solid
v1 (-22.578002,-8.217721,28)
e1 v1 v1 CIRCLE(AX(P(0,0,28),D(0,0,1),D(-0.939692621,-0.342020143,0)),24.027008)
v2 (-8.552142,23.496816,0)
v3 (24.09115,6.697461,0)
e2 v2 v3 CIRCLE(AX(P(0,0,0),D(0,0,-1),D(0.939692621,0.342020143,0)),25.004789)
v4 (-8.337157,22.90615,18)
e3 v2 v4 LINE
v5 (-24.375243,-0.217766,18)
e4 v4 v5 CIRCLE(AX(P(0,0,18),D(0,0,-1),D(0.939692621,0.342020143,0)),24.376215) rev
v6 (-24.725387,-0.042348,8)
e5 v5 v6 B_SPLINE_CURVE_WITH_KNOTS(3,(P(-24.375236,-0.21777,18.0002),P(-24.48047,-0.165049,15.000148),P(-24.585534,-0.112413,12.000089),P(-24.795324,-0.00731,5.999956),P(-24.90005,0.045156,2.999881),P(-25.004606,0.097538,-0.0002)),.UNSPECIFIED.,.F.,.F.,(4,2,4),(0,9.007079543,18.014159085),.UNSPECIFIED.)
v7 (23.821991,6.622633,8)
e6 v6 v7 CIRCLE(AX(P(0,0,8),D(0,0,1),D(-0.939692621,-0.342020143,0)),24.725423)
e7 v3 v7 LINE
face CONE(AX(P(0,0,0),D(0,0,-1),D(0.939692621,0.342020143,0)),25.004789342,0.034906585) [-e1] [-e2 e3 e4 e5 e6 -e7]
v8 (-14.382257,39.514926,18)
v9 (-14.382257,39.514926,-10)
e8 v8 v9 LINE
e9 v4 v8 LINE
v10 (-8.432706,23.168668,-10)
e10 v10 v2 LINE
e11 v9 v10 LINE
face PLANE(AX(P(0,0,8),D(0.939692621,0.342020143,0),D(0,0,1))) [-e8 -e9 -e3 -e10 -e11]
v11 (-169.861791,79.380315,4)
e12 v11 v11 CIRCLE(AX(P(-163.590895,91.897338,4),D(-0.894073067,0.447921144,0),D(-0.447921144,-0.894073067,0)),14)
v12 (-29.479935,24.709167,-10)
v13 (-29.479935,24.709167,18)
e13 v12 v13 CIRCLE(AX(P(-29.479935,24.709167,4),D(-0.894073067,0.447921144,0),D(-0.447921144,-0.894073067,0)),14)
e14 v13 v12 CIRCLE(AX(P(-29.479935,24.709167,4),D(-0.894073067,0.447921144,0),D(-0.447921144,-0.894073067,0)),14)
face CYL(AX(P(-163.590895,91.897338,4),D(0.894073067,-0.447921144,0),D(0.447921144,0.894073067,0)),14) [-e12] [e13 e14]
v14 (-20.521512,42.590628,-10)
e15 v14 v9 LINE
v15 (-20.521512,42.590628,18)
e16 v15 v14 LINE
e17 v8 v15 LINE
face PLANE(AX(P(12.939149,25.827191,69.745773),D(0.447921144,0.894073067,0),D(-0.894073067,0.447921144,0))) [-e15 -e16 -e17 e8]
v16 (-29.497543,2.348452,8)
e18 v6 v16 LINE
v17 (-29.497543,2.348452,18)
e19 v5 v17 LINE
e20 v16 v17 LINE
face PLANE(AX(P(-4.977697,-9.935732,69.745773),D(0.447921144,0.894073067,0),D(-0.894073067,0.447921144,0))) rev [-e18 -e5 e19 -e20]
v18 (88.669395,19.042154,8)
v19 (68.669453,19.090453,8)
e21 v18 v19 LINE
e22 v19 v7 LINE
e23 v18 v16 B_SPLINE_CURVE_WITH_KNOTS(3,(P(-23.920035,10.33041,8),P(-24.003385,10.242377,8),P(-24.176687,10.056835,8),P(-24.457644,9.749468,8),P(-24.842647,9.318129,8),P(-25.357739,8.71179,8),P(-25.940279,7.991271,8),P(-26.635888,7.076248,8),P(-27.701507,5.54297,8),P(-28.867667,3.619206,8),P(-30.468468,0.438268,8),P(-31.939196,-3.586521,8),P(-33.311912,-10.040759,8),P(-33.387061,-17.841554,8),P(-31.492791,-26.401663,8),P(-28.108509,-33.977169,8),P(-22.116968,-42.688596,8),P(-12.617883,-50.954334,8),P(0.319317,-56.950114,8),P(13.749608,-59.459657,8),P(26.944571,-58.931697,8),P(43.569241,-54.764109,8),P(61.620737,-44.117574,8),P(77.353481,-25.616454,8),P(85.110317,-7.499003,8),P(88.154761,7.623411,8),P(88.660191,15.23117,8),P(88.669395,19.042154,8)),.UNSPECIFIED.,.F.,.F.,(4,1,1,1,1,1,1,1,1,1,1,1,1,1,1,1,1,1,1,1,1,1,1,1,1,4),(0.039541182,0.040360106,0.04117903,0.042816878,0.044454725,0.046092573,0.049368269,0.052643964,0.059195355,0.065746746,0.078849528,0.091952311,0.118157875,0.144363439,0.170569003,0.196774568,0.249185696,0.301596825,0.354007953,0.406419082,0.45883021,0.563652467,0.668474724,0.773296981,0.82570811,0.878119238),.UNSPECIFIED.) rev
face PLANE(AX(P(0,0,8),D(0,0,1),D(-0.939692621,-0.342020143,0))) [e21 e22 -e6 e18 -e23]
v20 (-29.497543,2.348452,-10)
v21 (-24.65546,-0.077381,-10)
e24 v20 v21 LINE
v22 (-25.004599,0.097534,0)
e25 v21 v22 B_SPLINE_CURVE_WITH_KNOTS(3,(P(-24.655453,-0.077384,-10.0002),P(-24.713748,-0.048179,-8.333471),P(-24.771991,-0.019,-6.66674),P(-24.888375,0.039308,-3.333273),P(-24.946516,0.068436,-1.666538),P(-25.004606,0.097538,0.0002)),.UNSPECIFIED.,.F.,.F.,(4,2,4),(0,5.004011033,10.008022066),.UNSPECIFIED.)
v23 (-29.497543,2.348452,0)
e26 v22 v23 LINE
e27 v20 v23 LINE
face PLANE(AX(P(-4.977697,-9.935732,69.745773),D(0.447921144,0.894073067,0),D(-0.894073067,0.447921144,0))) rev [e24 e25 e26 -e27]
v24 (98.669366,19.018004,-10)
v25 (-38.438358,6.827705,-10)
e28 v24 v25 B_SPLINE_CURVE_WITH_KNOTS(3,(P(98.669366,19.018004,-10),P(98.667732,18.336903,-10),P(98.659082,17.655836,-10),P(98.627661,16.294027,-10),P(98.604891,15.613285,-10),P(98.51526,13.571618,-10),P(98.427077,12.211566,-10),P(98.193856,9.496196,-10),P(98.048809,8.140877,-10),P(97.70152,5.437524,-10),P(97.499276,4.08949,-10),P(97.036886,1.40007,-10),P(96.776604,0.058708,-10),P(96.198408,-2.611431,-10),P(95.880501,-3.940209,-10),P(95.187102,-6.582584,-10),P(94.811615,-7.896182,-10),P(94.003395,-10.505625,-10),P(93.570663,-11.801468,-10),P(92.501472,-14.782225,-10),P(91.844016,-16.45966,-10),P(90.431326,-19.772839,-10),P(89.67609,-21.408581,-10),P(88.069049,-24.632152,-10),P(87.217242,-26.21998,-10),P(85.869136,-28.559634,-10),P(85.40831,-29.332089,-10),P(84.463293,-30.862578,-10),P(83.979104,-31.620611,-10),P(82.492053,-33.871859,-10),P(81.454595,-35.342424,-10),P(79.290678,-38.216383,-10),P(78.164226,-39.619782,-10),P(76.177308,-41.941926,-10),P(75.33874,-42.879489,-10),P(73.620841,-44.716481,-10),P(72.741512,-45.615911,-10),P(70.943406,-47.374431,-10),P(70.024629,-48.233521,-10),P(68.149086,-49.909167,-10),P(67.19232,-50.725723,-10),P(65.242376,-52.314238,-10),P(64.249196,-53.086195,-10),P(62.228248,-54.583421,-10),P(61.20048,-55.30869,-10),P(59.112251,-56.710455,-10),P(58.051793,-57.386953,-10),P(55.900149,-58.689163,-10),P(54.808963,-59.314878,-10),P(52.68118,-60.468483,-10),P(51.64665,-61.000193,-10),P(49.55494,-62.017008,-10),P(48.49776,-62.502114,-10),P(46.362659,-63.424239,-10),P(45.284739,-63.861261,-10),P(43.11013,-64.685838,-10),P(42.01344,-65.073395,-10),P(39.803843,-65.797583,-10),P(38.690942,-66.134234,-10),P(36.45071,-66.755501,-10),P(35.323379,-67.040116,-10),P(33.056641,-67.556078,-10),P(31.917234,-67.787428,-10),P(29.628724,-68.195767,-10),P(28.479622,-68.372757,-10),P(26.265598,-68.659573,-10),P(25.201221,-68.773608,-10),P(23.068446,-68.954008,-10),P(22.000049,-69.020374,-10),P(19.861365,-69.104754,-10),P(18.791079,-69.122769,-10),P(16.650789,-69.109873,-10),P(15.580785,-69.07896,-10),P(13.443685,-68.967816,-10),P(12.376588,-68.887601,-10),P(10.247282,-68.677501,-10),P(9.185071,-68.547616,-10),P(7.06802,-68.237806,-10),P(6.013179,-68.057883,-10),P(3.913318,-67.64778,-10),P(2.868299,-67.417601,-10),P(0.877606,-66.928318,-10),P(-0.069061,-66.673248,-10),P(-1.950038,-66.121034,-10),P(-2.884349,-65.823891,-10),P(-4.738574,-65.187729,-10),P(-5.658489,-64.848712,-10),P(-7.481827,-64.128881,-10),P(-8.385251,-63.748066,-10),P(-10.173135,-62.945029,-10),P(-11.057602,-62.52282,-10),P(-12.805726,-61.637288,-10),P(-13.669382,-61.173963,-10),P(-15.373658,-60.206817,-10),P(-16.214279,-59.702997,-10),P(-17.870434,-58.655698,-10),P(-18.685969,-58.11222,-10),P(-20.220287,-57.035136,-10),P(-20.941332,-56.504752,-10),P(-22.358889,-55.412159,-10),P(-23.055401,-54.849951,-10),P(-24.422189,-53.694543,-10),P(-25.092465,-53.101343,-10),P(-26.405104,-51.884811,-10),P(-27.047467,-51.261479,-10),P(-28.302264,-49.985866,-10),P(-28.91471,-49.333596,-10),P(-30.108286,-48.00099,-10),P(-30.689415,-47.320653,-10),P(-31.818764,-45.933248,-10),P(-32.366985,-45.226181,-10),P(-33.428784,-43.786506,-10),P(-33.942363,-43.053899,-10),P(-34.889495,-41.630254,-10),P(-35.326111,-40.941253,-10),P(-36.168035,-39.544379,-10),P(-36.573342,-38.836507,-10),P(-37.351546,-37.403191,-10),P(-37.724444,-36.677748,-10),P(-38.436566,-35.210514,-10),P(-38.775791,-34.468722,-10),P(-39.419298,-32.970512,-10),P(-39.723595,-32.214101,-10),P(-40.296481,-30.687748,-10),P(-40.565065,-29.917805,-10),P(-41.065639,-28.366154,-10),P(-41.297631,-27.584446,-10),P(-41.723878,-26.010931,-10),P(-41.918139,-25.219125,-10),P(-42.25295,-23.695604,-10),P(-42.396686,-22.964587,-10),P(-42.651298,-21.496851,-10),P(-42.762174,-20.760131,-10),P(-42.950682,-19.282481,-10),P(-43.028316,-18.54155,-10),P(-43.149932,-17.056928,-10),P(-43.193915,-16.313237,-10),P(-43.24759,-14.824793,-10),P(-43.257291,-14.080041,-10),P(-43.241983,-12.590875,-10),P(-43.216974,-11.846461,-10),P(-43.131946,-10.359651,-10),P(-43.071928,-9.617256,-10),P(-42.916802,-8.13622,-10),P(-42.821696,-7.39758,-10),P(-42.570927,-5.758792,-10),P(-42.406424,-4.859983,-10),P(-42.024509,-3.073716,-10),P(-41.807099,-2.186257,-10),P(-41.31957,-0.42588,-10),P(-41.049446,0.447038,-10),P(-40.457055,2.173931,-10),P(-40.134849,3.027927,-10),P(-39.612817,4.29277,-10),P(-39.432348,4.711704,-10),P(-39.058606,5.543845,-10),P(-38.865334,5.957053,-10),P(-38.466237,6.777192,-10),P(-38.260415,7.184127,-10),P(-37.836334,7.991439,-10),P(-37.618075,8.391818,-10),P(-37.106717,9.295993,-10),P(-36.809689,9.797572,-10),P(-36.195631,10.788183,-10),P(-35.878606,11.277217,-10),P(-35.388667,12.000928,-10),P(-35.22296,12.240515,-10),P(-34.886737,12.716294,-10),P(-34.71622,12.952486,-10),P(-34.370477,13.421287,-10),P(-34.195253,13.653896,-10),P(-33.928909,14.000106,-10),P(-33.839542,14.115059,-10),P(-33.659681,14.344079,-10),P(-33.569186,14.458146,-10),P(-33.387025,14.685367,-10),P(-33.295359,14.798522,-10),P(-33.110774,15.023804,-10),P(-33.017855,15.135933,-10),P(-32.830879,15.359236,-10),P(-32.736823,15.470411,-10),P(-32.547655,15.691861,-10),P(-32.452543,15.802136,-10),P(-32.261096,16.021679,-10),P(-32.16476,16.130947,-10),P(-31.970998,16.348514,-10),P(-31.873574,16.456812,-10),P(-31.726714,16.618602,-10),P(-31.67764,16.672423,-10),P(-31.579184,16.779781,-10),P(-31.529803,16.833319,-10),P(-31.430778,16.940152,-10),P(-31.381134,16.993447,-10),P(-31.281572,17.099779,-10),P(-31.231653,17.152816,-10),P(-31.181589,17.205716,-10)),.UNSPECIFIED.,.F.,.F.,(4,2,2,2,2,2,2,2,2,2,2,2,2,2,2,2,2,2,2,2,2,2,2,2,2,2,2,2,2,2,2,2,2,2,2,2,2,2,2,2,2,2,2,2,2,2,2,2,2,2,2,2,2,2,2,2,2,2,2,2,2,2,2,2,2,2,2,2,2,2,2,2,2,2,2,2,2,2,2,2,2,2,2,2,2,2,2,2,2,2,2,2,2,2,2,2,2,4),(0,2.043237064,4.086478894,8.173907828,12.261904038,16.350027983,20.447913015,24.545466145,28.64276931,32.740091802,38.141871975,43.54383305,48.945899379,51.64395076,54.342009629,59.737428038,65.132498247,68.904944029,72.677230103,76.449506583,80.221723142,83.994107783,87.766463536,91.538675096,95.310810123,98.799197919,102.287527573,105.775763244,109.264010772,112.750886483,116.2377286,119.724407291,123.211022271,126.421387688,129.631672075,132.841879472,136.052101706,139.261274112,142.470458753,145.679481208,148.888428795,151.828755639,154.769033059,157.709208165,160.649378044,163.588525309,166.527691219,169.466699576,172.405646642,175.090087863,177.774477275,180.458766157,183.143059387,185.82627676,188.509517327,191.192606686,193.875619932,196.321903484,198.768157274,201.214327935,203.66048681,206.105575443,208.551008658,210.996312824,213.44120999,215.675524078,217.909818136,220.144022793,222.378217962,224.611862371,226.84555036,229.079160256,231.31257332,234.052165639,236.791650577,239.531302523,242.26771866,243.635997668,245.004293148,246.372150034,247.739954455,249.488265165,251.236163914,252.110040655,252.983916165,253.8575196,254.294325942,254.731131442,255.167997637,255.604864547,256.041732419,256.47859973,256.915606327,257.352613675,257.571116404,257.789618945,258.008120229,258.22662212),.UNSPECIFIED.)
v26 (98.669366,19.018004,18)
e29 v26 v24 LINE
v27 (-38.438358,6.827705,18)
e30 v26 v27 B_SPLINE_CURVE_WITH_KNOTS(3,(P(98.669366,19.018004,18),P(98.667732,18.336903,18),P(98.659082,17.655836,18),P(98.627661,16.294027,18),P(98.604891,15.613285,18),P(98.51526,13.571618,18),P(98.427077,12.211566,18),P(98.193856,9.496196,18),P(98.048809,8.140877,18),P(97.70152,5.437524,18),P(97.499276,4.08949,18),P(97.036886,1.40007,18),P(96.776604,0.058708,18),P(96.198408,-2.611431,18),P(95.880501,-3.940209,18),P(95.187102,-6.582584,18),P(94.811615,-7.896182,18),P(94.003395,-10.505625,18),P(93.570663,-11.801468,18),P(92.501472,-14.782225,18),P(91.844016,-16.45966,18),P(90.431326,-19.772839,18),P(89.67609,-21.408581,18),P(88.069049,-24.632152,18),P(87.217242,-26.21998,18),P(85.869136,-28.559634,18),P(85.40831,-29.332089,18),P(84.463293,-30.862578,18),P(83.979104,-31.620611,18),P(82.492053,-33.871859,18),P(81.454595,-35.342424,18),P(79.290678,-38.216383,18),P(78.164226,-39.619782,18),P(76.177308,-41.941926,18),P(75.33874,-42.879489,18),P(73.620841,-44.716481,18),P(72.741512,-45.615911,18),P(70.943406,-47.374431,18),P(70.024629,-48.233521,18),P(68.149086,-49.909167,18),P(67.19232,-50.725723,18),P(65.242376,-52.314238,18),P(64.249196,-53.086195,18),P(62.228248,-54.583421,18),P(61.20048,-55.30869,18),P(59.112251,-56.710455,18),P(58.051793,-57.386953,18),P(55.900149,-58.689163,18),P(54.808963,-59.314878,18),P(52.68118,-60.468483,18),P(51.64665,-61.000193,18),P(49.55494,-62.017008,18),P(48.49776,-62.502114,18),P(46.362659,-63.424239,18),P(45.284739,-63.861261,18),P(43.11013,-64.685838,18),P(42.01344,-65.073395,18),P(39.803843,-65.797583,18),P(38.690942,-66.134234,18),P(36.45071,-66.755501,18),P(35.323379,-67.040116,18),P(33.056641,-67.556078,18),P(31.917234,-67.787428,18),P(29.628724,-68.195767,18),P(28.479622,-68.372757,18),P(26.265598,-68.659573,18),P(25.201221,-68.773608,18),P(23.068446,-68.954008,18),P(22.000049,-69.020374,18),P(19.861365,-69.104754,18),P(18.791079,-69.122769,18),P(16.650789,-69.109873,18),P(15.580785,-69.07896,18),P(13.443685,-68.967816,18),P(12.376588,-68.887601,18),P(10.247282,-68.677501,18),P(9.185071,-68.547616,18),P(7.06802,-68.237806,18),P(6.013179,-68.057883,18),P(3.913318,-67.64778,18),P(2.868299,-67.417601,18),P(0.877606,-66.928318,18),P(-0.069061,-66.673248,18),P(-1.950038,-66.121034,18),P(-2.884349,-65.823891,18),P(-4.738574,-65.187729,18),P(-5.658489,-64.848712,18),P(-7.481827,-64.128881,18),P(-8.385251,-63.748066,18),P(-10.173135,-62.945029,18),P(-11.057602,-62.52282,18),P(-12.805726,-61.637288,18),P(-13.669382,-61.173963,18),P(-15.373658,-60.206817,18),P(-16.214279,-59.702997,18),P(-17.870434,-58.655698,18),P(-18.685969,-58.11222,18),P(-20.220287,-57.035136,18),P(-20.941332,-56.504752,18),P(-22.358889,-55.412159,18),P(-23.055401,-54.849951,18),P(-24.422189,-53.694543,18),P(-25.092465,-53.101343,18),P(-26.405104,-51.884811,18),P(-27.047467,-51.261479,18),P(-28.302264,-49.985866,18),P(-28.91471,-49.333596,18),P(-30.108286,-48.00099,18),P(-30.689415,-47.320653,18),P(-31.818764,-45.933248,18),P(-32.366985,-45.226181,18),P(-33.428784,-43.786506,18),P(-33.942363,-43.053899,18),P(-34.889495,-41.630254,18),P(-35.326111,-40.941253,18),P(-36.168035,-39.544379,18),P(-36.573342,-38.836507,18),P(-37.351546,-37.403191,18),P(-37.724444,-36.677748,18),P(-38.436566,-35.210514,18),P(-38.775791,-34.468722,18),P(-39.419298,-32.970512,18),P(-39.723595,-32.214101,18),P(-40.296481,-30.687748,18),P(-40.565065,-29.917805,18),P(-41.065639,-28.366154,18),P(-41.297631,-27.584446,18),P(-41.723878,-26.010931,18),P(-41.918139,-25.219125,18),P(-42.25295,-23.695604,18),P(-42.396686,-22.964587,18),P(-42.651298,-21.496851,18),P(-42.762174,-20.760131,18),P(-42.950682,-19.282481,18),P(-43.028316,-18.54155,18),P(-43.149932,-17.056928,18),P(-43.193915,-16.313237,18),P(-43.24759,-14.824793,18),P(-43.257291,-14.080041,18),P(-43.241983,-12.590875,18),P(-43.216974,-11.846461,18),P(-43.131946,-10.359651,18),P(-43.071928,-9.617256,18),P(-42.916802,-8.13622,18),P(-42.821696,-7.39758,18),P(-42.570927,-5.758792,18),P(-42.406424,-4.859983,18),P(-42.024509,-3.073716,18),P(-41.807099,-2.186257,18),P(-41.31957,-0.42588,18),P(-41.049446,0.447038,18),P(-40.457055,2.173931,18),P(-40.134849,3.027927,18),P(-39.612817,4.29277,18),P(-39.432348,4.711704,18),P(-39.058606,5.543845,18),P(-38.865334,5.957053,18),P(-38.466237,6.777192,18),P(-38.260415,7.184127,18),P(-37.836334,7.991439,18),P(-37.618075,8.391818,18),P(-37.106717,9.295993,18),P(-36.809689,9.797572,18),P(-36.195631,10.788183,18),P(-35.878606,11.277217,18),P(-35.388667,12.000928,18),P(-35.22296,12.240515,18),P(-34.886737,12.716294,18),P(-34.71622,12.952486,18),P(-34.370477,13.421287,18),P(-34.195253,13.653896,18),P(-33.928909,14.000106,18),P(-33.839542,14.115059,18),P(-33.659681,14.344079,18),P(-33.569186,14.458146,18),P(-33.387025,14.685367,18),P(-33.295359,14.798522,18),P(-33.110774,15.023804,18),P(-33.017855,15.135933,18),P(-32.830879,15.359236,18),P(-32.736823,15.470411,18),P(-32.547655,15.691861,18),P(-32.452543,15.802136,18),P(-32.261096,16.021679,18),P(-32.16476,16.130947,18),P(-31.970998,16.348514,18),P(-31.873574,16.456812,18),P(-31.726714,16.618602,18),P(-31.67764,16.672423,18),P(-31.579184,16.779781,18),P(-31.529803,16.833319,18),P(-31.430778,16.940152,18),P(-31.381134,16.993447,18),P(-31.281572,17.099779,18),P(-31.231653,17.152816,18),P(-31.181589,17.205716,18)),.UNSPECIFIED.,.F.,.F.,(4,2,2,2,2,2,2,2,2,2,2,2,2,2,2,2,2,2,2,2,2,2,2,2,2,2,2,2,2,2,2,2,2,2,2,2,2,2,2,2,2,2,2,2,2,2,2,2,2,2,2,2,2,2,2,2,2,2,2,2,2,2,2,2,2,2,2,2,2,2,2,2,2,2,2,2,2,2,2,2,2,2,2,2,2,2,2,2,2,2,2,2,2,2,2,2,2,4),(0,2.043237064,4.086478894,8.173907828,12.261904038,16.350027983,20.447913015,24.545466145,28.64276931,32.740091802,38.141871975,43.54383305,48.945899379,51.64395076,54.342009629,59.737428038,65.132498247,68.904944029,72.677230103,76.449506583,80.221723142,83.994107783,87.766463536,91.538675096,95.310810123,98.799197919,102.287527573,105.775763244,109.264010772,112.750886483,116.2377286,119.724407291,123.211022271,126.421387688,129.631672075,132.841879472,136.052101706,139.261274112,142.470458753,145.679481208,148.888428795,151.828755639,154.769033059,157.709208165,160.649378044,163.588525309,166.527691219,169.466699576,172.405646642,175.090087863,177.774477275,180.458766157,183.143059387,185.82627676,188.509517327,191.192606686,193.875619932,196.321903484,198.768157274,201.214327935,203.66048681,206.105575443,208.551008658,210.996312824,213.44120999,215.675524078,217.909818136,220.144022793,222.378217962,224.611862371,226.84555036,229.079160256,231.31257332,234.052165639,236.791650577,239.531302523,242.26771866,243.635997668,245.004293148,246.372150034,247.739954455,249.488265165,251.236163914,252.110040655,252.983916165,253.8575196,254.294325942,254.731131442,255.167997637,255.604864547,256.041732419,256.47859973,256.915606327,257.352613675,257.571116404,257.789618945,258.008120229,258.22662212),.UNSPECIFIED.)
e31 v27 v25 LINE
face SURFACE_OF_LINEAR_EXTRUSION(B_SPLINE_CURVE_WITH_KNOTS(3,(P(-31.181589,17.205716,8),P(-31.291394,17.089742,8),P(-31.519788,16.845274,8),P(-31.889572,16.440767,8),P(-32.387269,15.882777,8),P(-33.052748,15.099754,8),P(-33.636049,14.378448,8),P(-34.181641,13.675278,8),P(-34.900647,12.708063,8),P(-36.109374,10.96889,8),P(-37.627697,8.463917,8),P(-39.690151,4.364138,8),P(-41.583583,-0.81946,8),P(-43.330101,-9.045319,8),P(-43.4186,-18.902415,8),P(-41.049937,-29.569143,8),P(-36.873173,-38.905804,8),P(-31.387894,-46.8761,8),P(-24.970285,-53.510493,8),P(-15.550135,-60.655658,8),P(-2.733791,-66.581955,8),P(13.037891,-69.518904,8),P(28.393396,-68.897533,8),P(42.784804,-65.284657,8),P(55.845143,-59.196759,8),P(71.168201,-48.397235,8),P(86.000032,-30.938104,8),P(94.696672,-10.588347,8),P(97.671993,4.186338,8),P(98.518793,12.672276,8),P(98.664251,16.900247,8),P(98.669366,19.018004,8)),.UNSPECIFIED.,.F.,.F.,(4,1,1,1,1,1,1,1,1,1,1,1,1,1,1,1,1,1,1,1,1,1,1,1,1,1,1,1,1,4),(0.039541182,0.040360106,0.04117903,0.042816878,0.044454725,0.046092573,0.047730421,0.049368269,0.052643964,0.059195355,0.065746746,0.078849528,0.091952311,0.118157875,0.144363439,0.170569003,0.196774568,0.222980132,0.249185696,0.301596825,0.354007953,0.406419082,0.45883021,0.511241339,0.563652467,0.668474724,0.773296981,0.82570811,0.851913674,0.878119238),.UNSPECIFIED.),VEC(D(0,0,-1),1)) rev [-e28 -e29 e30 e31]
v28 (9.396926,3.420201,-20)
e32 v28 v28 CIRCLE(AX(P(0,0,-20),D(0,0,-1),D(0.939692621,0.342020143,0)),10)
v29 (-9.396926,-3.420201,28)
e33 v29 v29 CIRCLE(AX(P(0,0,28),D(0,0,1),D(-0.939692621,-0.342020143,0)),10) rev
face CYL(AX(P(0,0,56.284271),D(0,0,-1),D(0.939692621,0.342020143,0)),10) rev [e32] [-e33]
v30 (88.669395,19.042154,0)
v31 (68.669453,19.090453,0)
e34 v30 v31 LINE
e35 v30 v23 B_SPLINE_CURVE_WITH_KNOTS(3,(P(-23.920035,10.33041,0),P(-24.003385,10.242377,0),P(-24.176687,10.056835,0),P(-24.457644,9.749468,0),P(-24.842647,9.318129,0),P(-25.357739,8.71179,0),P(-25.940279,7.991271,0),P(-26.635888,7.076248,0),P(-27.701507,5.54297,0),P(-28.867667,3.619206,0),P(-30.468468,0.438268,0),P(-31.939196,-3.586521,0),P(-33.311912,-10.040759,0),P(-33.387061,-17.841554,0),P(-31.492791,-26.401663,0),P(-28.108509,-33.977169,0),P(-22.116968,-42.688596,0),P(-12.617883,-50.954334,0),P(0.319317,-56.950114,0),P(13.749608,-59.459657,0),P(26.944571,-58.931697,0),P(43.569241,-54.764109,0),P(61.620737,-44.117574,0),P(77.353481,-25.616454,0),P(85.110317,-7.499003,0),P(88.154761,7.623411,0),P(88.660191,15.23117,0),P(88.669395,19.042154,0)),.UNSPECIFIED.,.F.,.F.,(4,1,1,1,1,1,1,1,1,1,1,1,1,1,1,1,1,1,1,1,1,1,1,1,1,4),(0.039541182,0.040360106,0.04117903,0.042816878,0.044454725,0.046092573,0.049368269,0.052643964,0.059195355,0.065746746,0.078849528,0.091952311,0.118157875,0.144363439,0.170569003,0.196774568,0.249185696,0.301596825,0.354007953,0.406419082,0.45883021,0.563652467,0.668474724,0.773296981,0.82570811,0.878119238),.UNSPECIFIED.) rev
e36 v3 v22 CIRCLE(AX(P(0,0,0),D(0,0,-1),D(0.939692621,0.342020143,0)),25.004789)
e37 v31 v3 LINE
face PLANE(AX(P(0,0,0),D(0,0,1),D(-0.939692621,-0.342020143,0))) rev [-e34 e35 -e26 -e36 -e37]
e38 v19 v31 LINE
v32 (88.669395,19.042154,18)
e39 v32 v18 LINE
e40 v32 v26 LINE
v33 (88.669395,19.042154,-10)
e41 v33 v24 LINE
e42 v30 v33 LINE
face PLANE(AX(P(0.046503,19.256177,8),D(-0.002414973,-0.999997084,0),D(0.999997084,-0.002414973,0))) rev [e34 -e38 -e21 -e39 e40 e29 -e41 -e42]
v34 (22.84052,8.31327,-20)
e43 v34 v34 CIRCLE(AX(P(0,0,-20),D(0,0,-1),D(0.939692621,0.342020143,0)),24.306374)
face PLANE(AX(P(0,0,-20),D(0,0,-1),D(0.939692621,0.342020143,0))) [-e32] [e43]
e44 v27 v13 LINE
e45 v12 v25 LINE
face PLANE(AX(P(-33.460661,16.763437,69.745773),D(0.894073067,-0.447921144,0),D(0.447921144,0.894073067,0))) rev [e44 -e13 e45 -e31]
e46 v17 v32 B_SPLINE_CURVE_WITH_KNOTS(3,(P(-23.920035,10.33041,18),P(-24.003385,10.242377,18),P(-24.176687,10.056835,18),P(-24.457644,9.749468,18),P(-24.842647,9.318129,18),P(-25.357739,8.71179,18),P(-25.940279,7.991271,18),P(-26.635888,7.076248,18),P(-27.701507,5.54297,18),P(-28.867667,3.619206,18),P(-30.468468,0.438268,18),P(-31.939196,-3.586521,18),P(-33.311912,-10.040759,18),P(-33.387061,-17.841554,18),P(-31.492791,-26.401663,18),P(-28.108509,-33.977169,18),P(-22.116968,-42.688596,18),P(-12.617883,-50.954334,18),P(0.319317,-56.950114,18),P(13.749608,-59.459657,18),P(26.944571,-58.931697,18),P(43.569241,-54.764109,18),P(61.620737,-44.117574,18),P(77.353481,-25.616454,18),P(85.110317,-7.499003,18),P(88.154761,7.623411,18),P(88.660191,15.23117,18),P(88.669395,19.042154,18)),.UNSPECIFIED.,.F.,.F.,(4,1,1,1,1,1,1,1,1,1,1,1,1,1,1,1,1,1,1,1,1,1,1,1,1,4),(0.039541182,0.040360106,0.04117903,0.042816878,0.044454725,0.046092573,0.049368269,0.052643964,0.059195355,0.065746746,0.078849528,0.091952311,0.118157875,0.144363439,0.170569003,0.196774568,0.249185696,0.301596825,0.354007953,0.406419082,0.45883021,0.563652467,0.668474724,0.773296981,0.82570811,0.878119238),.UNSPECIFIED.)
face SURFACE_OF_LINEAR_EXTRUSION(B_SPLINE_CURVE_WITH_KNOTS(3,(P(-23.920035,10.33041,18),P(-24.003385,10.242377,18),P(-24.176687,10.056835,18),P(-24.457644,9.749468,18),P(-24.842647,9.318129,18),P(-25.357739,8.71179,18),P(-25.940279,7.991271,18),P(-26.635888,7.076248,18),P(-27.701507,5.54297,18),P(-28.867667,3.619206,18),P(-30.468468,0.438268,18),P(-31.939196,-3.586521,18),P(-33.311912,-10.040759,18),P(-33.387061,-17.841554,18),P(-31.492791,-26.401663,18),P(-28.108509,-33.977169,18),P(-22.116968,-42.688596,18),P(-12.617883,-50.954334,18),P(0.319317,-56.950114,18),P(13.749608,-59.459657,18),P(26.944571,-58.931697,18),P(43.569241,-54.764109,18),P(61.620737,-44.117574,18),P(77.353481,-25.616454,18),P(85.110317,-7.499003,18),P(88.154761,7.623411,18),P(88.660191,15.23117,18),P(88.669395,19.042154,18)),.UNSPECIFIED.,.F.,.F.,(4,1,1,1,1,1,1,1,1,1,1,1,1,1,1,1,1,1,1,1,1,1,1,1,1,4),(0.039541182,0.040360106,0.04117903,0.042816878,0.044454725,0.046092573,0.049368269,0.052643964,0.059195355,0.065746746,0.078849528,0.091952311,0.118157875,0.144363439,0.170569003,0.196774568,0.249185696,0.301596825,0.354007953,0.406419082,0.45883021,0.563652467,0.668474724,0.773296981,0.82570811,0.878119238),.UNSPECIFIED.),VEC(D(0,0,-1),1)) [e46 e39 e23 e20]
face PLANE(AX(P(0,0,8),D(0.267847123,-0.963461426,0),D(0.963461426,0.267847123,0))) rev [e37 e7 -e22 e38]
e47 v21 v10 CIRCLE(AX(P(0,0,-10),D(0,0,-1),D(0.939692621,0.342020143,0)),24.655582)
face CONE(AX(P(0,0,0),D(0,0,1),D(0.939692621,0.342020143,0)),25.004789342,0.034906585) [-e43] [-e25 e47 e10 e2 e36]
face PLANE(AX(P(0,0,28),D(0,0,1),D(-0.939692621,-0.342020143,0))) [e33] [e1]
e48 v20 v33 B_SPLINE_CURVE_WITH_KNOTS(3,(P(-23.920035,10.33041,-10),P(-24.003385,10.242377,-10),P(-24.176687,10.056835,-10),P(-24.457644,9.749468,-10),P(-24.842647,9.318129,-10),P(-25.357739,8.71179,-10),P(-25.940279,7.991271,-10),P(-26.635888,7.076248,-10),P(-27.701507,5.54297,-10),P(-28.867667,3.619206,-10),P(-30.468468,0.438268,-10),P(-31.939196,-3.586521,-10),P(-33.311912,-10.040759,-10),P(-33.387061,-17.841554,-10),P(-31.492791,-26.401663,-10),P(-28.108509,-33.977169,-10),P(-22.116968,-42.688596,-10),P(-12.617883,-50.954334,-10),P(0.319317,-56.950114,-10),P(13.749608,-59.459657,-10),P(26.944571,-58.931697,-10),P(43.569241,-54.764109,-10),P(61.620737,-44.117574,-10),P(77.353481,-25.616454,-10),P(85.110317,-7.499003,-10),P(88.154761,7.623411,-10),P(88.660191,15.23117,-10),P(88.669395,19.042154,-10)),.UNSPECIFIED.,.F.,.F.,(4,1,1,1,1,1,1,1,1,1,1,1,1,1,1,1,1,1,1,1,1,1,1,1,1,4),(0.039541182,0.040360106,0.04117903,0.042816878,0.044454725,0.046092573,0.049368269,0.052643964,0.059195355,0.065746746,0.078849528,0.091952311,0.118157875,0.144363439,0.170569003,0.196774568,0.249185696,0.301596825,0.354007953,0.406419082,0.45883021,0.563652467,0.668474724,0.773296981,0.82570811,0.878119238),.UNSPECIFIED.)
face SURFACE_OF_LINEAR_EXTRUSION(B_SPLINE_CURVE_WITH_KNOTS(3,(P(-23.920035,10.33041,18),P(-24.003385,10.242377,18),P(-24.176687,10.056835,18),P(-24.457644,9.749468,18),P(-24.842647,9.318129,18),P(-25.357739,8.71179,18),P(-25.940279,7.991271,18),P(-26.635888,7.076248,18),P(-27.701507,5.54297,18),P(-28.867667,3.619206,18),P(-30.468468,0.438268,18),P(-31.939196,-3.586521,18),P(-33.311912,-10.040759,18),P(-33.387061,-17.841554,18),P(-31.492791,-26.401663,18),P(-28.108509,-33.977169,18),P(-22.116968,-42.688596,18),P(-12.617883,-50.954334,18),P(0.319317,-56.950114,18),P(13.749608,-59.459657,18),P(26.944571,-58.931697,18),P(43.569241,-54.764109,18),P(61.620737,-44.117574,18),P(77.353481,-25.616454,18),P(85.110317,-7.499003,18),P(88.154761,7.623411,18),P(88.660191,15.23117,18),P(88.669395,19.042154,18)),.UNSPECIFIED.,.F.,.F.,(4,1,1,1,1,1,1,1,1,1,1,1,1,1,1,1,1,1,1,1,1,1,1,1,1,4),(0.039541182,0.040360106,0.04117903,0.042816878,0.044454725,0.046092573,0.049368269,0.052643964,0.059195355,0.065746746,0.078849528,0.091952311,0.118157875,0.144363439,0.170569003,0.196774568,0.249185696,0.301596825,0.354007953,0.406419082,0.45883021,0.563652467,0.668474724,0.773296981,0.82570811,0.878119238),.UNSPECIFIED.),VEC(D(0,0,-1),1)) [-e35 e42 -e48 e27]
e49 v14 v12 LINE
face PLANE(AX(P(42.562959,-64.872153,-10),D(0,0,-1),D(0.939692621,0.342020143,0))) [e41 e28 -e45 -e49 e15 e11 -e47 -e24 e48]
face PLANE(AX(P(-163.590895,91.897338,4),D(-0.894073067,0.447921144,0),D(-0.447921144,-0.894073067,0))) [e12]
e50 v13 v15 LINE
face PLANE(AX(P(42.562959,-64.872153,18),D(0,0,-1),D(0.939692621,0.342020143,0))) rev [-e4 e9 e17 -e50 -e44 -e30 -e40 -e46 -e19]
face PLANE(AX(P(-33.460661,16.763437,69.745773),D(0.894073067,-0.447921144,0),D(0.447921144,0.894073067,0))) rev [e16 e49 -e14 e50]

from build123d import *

# Parameters (mm, degrees)
SKETCH_1_R           = 10.000000001
EXTRUDE_1_DEPTH      = 8
EXTRUDE_2_DEPTH      = 10
EXTRUDE_2_DEPTH_BACK = 18
EXTRUDE_4_DEPTH      = 20
EXTRUDE_4_TAPER      = 2
SKETCH_5_R           = 10
CUT_EXTRUDE_1_DEPTH  = 48
EXTRUDE_START        = -14
EXTRUDE_5_DEPTH      = 28
SKETCH_7_R           = 14
EXTRUDE_6_DEPTH      = 150
MOVE_BODY_1_ANGLE    = 160


# Read off the part's stored shape, not the designer's step: 凸台-拉伸3, 凸台-拉伸5
with BuildPart() as part:
    # 草图1 → 凸台-拉伸1 (new body)
    with BuildSketch(Plane.XY):
        Circle(SKETCH_1_R)
        with BuildLine():
            Line((-99.223415369, 15.875832346), (-71.057498037, 5.54717799))
            Line((-71.057498037, 5.54717799), (0, 0))
            Line((0, 0), (0, -25.00478934))
            Line((0, -25.00478934), (23.416407848, -26.832815739))
            add(Edge.make_bspline(
                [(23.416407848, -26.832815739), (23.559255777, -26.761391774), (23.857489252, -26.609782504), (24.343322546, -26.356143142), (25.001847908, -26.00202666), (25.895002872, -25.493833349), (26.689827796, -25.015527515), (27.443014709, -24.541367746), (28.44946677, -23.878396743), (30.180130615, -22.657518607), (32.463639395, -20.822910489), (35.803918719, -17.675778925), (39.356057937, -13.452382092), (43.810657679, -6.319948363), (47.26514501, 2.912424346), (48.687565133, 13.74600062), (47.956016905, 23.948129205), (45.527543401, 33.31383343), (41.766058602, 41.743075171), (35.35780408, 51.679214297), (25.341292826, 61.631560208), (11.525255636, 69.785622537), (-3.116720541, 74.453616351), (-17.875896804, 75.980775652), (-32.230785273, 74.726921151), (-50.32340393, 69.819482921), (-70.232141124, 58.486051284), (-85.364335796, 42.337960666), (-93.213462614, 29.471917912), (-96.911556554, 21.787367795), (-98.494293842, 17.864123943), (-99.223415369, 15.875832346)],
                knots=[0.039541182, 0.039541182, 0.039541182, 0.039541182, 0.040360106, 0.04117903, 0.042816878, 0.044454725, 0.046092573, 0.047730421, 0.049368269, 0.052643964, 0.059195355, 0.065746746, 0.078849528, 0.091952311, 0.118157875, 0.144363439, 0.170569003, 0.196774568, 0.222980132, 0.249185696, 0.301596825, 0.354007953, 0.406419082, 0.45883021, 0.511241339, 0.563652467, 0.668474724, 0.773296981, 0.82570811, 0.851913674, 0.878119238, 0.878119238, 0.878119238, 0.878119238], degree=3))
        make_face()
    extrude(amount=EXTRUDE_1_DEPTH)

    # 草图2 → 凸台-拉伸2 (add, two sides: drawn at the far end of the back side and taken through both)
    with BuildSketch(Plane(origin=(0, 0, 0), x_dir=(-1, 0, 0), z_dir=(0, 0, -1)).offset(-EXTRUDE_2_DEPTH_BACK)):
        with BuildLine():
            Line((-23.416407848, -26.832815739), (-18.944271899, -17.888543826))
            add(Edge.make_bspline(
                [(-18.944271899, -17.888543826), (-19.052705032, -17.834327259), (-19.279014375, -17.71924736), (-19.648152988, -17.526510294), (-20.157464576, -17.252862811), (-20.848872628, -16.859261983), (-21.642713236, -16.38143627), (-22.609327917, -15.759508594), (-24.135094314, -14.683161103), (-25.88889207, -13.274264185), (-28.481097704, -10.832666814), (-31.239689124, -7.553621002), (-34.737099736, -1.958117593), (-37.47574582, 5.346529302), (-38.623443824, 14.038278874), (-38.034234701, 22.314418593), (-35.383511893, 32.549710241), (-29.284340235, 43.56584113), (-19.178025873, 53.624814399), (-7.415995151, 60.576443845), (5.163786787, 64.593266285), (22.211265662, 66.362987302), (42.815452692, 62.532491918), (63.927151805, 50.528041572), (77.41272726, 36.156200275), (85.445738505, 22.987041434), (88.522694561, 16.010953304), (89.834776258, 12.432947561)],
                knots=[0.039541182, 0.039541182, 0.039541182, 0.039541182, 0.040360106, 0.04117903, 0.042816878, 0.044454725, 0.046092573, 0.049368269, 0.052643964, 0.059195355, 0.065746746, 0.078849528, 0.091952311, 0.118157875, 0.144363439, 0.170569003, 0.196774568, 0.249185696, 0.301596825, 0.354007953, 0.406419082, 0.45883021, 0.563652467, 0.668474724, 0.773296981, 0.82570811, 0.878119238, 0.878119238, 0.878119238, 0.878119238], degree=3))
            Line((89.834776258, 12.432947561), (99.223415369, 15.875832346))
            add(Edge.make_bspline(
                [(-23.416407848, -26.832815739), (-23.559255777, -26.761391774), (-23.857489252, -26.609782504), (-24.343322546, -26.356143142), (-25.001847908, -26.00202666), (-25.895002872, -25.493833349), (-26.689827796, -25.015527515), (-27.443014709, -24.541367746), (-28.44946677, -23.878396743), (-30.180130615, -22.657518607), (-32.463639395, -20.822910489), (-35.803918719, -17.675778925), (-39.356057937, -13.452382092), (-43.810657679, -6.319948363), (-47.26514501, 2.912424346), (-48.687565133, 13.74600062), (-47.956016905, 23.948129205), (-45.527543401, 33.31383343), (-41.766058602, 41.743075171), (-35.35780408, 51.679214297), (-25.341292826, 61.631560208), (-11.525255636, 69.785622537), (3.116720541, 74.453616351), (17.875896804, 75.980775652), (32.230785273, 74.726921151), (50.32340393, 69.819482921), (70.232141124, 58.486051284), (85.364335796, 42.337960666), (93.213462614, 29.471917912), (96.911556554, 21.787367795), (98.494293842, 17.864123943), (99.223415369, 15.875832346)],
                knots=[0.039541182, 0.039541182, 0.039541182, 0.039541182, 0.040360106, 0.04117903, 0.042816878, 0.044454725, 0.046092573, 0.047730421, 0.049368269, 0.052643964, 0.059195355, 0.065746746, 0.078849528, 0.091952311, 0.118157875, 0.144363439, 0.170569003, 0.196774568, 0.222980132, 0.249185696, 0.301596825, 0.354007953, 0.406419082, 0.45883021, 0.511241339, 0.563652467, 0.668474724, 0.773296981, 0.82570811, 0.851913674, 0.878119238, 0.878119238, 0.878119238, 0.878119238], degree=3))
        make_face()
    extrude(amount=EXTRUDE_2_DEPTH + EXTRUDE_2_DEPTH_BACK)

    # 凸台-拉伸3 outline → 凸台-拉伸3 (revolve)
    with BuildSketch(Plane.XZ):
        Polygon((10.000000001, 8), (10.000000001, 0), (0, 0), (0, -20), (24.306373953, -20), (25.004789342, 0), (24.725423186, 8), align=None)
    revolve(axis=Axis((0, 0, 0), (0, 0, 1)))

    # 草图4 → 凸台-拉伸4 (add)
    with BuildSketch(Plane.XY.offset(8)):
        with BuildLine():
            ThreePointArc((24.725423186, 0), (0.962911043, 24.706666187), (-24.650423647, 1.924361134))
            ThreePointArc((-24.650423647, 1.924361134), (-18.151132129, -16.789370273), (0, -24.725423186))
            ThreePointArc((0, -24.725423186), (17.483514403, -17.483514403), (24.725423186, 0))
        make_face()
    extrude(amount=EXTRUDE_4_DEPTH, taper=EXTRUDE_4_TAPER)

    # 草图5 → 切除-拉伸1 (cut)
    with BuildSketch(Plane(origin=(0, 0, -20), x_dir=(-1, 0, 0), z_dir=(0, 0, -1))):
        Circle(SKETCH_5_R)
    extrude(amount=-CUT_EXTRUDE_1_DEPTH, mode=Mode.SUBTRACT)

    # 凸台-拉伸5 outline → 凸台-拉伸5 (add)
    with BuildSketch(Plane.XY.offset(4).offset(EXTRUDE_START)):
        with BuildLine():
            Line((0, -42.050906086), (4.717060846, -47.040869425))
            Line((4.717060846, -47.040869425), (33.785028526, -19.562637042))
            Line((33.785028526, -19.562637042), (22.709671659, -7.846522593))
            ThreePointArc((22.709671659, -7.846522593), (13.94217781, -19.568157337), (0, -24.027007797))
            Line((0, -24.027007797), (0, -42.050906086))
        make_face()
    extrude(amount=EXTRUDE_5_DEPTH)

    # 草图7 → 凸台-拉伸6 (add)
    with BuildSketch(Plane(origin=(25.70930342, -27.19669848, 0), x_dir=(0, 0, -1), z_dir=(0.6869558095891056, -0.7266991920126075, 0))):
        with Locations((-4, -8.887114234)):
            Circle(SKETCH_7_R)
    extrude(amount=EXTRUDE_6_DEPTH)


with BuildPart() as part_1:
    # Move Body 1: moved
    add(part.part.rotate(Axis((0, 0, 0), (0, 0, -1)), MOVE_BODY_1_ANGLE))


solid = part_1.part
